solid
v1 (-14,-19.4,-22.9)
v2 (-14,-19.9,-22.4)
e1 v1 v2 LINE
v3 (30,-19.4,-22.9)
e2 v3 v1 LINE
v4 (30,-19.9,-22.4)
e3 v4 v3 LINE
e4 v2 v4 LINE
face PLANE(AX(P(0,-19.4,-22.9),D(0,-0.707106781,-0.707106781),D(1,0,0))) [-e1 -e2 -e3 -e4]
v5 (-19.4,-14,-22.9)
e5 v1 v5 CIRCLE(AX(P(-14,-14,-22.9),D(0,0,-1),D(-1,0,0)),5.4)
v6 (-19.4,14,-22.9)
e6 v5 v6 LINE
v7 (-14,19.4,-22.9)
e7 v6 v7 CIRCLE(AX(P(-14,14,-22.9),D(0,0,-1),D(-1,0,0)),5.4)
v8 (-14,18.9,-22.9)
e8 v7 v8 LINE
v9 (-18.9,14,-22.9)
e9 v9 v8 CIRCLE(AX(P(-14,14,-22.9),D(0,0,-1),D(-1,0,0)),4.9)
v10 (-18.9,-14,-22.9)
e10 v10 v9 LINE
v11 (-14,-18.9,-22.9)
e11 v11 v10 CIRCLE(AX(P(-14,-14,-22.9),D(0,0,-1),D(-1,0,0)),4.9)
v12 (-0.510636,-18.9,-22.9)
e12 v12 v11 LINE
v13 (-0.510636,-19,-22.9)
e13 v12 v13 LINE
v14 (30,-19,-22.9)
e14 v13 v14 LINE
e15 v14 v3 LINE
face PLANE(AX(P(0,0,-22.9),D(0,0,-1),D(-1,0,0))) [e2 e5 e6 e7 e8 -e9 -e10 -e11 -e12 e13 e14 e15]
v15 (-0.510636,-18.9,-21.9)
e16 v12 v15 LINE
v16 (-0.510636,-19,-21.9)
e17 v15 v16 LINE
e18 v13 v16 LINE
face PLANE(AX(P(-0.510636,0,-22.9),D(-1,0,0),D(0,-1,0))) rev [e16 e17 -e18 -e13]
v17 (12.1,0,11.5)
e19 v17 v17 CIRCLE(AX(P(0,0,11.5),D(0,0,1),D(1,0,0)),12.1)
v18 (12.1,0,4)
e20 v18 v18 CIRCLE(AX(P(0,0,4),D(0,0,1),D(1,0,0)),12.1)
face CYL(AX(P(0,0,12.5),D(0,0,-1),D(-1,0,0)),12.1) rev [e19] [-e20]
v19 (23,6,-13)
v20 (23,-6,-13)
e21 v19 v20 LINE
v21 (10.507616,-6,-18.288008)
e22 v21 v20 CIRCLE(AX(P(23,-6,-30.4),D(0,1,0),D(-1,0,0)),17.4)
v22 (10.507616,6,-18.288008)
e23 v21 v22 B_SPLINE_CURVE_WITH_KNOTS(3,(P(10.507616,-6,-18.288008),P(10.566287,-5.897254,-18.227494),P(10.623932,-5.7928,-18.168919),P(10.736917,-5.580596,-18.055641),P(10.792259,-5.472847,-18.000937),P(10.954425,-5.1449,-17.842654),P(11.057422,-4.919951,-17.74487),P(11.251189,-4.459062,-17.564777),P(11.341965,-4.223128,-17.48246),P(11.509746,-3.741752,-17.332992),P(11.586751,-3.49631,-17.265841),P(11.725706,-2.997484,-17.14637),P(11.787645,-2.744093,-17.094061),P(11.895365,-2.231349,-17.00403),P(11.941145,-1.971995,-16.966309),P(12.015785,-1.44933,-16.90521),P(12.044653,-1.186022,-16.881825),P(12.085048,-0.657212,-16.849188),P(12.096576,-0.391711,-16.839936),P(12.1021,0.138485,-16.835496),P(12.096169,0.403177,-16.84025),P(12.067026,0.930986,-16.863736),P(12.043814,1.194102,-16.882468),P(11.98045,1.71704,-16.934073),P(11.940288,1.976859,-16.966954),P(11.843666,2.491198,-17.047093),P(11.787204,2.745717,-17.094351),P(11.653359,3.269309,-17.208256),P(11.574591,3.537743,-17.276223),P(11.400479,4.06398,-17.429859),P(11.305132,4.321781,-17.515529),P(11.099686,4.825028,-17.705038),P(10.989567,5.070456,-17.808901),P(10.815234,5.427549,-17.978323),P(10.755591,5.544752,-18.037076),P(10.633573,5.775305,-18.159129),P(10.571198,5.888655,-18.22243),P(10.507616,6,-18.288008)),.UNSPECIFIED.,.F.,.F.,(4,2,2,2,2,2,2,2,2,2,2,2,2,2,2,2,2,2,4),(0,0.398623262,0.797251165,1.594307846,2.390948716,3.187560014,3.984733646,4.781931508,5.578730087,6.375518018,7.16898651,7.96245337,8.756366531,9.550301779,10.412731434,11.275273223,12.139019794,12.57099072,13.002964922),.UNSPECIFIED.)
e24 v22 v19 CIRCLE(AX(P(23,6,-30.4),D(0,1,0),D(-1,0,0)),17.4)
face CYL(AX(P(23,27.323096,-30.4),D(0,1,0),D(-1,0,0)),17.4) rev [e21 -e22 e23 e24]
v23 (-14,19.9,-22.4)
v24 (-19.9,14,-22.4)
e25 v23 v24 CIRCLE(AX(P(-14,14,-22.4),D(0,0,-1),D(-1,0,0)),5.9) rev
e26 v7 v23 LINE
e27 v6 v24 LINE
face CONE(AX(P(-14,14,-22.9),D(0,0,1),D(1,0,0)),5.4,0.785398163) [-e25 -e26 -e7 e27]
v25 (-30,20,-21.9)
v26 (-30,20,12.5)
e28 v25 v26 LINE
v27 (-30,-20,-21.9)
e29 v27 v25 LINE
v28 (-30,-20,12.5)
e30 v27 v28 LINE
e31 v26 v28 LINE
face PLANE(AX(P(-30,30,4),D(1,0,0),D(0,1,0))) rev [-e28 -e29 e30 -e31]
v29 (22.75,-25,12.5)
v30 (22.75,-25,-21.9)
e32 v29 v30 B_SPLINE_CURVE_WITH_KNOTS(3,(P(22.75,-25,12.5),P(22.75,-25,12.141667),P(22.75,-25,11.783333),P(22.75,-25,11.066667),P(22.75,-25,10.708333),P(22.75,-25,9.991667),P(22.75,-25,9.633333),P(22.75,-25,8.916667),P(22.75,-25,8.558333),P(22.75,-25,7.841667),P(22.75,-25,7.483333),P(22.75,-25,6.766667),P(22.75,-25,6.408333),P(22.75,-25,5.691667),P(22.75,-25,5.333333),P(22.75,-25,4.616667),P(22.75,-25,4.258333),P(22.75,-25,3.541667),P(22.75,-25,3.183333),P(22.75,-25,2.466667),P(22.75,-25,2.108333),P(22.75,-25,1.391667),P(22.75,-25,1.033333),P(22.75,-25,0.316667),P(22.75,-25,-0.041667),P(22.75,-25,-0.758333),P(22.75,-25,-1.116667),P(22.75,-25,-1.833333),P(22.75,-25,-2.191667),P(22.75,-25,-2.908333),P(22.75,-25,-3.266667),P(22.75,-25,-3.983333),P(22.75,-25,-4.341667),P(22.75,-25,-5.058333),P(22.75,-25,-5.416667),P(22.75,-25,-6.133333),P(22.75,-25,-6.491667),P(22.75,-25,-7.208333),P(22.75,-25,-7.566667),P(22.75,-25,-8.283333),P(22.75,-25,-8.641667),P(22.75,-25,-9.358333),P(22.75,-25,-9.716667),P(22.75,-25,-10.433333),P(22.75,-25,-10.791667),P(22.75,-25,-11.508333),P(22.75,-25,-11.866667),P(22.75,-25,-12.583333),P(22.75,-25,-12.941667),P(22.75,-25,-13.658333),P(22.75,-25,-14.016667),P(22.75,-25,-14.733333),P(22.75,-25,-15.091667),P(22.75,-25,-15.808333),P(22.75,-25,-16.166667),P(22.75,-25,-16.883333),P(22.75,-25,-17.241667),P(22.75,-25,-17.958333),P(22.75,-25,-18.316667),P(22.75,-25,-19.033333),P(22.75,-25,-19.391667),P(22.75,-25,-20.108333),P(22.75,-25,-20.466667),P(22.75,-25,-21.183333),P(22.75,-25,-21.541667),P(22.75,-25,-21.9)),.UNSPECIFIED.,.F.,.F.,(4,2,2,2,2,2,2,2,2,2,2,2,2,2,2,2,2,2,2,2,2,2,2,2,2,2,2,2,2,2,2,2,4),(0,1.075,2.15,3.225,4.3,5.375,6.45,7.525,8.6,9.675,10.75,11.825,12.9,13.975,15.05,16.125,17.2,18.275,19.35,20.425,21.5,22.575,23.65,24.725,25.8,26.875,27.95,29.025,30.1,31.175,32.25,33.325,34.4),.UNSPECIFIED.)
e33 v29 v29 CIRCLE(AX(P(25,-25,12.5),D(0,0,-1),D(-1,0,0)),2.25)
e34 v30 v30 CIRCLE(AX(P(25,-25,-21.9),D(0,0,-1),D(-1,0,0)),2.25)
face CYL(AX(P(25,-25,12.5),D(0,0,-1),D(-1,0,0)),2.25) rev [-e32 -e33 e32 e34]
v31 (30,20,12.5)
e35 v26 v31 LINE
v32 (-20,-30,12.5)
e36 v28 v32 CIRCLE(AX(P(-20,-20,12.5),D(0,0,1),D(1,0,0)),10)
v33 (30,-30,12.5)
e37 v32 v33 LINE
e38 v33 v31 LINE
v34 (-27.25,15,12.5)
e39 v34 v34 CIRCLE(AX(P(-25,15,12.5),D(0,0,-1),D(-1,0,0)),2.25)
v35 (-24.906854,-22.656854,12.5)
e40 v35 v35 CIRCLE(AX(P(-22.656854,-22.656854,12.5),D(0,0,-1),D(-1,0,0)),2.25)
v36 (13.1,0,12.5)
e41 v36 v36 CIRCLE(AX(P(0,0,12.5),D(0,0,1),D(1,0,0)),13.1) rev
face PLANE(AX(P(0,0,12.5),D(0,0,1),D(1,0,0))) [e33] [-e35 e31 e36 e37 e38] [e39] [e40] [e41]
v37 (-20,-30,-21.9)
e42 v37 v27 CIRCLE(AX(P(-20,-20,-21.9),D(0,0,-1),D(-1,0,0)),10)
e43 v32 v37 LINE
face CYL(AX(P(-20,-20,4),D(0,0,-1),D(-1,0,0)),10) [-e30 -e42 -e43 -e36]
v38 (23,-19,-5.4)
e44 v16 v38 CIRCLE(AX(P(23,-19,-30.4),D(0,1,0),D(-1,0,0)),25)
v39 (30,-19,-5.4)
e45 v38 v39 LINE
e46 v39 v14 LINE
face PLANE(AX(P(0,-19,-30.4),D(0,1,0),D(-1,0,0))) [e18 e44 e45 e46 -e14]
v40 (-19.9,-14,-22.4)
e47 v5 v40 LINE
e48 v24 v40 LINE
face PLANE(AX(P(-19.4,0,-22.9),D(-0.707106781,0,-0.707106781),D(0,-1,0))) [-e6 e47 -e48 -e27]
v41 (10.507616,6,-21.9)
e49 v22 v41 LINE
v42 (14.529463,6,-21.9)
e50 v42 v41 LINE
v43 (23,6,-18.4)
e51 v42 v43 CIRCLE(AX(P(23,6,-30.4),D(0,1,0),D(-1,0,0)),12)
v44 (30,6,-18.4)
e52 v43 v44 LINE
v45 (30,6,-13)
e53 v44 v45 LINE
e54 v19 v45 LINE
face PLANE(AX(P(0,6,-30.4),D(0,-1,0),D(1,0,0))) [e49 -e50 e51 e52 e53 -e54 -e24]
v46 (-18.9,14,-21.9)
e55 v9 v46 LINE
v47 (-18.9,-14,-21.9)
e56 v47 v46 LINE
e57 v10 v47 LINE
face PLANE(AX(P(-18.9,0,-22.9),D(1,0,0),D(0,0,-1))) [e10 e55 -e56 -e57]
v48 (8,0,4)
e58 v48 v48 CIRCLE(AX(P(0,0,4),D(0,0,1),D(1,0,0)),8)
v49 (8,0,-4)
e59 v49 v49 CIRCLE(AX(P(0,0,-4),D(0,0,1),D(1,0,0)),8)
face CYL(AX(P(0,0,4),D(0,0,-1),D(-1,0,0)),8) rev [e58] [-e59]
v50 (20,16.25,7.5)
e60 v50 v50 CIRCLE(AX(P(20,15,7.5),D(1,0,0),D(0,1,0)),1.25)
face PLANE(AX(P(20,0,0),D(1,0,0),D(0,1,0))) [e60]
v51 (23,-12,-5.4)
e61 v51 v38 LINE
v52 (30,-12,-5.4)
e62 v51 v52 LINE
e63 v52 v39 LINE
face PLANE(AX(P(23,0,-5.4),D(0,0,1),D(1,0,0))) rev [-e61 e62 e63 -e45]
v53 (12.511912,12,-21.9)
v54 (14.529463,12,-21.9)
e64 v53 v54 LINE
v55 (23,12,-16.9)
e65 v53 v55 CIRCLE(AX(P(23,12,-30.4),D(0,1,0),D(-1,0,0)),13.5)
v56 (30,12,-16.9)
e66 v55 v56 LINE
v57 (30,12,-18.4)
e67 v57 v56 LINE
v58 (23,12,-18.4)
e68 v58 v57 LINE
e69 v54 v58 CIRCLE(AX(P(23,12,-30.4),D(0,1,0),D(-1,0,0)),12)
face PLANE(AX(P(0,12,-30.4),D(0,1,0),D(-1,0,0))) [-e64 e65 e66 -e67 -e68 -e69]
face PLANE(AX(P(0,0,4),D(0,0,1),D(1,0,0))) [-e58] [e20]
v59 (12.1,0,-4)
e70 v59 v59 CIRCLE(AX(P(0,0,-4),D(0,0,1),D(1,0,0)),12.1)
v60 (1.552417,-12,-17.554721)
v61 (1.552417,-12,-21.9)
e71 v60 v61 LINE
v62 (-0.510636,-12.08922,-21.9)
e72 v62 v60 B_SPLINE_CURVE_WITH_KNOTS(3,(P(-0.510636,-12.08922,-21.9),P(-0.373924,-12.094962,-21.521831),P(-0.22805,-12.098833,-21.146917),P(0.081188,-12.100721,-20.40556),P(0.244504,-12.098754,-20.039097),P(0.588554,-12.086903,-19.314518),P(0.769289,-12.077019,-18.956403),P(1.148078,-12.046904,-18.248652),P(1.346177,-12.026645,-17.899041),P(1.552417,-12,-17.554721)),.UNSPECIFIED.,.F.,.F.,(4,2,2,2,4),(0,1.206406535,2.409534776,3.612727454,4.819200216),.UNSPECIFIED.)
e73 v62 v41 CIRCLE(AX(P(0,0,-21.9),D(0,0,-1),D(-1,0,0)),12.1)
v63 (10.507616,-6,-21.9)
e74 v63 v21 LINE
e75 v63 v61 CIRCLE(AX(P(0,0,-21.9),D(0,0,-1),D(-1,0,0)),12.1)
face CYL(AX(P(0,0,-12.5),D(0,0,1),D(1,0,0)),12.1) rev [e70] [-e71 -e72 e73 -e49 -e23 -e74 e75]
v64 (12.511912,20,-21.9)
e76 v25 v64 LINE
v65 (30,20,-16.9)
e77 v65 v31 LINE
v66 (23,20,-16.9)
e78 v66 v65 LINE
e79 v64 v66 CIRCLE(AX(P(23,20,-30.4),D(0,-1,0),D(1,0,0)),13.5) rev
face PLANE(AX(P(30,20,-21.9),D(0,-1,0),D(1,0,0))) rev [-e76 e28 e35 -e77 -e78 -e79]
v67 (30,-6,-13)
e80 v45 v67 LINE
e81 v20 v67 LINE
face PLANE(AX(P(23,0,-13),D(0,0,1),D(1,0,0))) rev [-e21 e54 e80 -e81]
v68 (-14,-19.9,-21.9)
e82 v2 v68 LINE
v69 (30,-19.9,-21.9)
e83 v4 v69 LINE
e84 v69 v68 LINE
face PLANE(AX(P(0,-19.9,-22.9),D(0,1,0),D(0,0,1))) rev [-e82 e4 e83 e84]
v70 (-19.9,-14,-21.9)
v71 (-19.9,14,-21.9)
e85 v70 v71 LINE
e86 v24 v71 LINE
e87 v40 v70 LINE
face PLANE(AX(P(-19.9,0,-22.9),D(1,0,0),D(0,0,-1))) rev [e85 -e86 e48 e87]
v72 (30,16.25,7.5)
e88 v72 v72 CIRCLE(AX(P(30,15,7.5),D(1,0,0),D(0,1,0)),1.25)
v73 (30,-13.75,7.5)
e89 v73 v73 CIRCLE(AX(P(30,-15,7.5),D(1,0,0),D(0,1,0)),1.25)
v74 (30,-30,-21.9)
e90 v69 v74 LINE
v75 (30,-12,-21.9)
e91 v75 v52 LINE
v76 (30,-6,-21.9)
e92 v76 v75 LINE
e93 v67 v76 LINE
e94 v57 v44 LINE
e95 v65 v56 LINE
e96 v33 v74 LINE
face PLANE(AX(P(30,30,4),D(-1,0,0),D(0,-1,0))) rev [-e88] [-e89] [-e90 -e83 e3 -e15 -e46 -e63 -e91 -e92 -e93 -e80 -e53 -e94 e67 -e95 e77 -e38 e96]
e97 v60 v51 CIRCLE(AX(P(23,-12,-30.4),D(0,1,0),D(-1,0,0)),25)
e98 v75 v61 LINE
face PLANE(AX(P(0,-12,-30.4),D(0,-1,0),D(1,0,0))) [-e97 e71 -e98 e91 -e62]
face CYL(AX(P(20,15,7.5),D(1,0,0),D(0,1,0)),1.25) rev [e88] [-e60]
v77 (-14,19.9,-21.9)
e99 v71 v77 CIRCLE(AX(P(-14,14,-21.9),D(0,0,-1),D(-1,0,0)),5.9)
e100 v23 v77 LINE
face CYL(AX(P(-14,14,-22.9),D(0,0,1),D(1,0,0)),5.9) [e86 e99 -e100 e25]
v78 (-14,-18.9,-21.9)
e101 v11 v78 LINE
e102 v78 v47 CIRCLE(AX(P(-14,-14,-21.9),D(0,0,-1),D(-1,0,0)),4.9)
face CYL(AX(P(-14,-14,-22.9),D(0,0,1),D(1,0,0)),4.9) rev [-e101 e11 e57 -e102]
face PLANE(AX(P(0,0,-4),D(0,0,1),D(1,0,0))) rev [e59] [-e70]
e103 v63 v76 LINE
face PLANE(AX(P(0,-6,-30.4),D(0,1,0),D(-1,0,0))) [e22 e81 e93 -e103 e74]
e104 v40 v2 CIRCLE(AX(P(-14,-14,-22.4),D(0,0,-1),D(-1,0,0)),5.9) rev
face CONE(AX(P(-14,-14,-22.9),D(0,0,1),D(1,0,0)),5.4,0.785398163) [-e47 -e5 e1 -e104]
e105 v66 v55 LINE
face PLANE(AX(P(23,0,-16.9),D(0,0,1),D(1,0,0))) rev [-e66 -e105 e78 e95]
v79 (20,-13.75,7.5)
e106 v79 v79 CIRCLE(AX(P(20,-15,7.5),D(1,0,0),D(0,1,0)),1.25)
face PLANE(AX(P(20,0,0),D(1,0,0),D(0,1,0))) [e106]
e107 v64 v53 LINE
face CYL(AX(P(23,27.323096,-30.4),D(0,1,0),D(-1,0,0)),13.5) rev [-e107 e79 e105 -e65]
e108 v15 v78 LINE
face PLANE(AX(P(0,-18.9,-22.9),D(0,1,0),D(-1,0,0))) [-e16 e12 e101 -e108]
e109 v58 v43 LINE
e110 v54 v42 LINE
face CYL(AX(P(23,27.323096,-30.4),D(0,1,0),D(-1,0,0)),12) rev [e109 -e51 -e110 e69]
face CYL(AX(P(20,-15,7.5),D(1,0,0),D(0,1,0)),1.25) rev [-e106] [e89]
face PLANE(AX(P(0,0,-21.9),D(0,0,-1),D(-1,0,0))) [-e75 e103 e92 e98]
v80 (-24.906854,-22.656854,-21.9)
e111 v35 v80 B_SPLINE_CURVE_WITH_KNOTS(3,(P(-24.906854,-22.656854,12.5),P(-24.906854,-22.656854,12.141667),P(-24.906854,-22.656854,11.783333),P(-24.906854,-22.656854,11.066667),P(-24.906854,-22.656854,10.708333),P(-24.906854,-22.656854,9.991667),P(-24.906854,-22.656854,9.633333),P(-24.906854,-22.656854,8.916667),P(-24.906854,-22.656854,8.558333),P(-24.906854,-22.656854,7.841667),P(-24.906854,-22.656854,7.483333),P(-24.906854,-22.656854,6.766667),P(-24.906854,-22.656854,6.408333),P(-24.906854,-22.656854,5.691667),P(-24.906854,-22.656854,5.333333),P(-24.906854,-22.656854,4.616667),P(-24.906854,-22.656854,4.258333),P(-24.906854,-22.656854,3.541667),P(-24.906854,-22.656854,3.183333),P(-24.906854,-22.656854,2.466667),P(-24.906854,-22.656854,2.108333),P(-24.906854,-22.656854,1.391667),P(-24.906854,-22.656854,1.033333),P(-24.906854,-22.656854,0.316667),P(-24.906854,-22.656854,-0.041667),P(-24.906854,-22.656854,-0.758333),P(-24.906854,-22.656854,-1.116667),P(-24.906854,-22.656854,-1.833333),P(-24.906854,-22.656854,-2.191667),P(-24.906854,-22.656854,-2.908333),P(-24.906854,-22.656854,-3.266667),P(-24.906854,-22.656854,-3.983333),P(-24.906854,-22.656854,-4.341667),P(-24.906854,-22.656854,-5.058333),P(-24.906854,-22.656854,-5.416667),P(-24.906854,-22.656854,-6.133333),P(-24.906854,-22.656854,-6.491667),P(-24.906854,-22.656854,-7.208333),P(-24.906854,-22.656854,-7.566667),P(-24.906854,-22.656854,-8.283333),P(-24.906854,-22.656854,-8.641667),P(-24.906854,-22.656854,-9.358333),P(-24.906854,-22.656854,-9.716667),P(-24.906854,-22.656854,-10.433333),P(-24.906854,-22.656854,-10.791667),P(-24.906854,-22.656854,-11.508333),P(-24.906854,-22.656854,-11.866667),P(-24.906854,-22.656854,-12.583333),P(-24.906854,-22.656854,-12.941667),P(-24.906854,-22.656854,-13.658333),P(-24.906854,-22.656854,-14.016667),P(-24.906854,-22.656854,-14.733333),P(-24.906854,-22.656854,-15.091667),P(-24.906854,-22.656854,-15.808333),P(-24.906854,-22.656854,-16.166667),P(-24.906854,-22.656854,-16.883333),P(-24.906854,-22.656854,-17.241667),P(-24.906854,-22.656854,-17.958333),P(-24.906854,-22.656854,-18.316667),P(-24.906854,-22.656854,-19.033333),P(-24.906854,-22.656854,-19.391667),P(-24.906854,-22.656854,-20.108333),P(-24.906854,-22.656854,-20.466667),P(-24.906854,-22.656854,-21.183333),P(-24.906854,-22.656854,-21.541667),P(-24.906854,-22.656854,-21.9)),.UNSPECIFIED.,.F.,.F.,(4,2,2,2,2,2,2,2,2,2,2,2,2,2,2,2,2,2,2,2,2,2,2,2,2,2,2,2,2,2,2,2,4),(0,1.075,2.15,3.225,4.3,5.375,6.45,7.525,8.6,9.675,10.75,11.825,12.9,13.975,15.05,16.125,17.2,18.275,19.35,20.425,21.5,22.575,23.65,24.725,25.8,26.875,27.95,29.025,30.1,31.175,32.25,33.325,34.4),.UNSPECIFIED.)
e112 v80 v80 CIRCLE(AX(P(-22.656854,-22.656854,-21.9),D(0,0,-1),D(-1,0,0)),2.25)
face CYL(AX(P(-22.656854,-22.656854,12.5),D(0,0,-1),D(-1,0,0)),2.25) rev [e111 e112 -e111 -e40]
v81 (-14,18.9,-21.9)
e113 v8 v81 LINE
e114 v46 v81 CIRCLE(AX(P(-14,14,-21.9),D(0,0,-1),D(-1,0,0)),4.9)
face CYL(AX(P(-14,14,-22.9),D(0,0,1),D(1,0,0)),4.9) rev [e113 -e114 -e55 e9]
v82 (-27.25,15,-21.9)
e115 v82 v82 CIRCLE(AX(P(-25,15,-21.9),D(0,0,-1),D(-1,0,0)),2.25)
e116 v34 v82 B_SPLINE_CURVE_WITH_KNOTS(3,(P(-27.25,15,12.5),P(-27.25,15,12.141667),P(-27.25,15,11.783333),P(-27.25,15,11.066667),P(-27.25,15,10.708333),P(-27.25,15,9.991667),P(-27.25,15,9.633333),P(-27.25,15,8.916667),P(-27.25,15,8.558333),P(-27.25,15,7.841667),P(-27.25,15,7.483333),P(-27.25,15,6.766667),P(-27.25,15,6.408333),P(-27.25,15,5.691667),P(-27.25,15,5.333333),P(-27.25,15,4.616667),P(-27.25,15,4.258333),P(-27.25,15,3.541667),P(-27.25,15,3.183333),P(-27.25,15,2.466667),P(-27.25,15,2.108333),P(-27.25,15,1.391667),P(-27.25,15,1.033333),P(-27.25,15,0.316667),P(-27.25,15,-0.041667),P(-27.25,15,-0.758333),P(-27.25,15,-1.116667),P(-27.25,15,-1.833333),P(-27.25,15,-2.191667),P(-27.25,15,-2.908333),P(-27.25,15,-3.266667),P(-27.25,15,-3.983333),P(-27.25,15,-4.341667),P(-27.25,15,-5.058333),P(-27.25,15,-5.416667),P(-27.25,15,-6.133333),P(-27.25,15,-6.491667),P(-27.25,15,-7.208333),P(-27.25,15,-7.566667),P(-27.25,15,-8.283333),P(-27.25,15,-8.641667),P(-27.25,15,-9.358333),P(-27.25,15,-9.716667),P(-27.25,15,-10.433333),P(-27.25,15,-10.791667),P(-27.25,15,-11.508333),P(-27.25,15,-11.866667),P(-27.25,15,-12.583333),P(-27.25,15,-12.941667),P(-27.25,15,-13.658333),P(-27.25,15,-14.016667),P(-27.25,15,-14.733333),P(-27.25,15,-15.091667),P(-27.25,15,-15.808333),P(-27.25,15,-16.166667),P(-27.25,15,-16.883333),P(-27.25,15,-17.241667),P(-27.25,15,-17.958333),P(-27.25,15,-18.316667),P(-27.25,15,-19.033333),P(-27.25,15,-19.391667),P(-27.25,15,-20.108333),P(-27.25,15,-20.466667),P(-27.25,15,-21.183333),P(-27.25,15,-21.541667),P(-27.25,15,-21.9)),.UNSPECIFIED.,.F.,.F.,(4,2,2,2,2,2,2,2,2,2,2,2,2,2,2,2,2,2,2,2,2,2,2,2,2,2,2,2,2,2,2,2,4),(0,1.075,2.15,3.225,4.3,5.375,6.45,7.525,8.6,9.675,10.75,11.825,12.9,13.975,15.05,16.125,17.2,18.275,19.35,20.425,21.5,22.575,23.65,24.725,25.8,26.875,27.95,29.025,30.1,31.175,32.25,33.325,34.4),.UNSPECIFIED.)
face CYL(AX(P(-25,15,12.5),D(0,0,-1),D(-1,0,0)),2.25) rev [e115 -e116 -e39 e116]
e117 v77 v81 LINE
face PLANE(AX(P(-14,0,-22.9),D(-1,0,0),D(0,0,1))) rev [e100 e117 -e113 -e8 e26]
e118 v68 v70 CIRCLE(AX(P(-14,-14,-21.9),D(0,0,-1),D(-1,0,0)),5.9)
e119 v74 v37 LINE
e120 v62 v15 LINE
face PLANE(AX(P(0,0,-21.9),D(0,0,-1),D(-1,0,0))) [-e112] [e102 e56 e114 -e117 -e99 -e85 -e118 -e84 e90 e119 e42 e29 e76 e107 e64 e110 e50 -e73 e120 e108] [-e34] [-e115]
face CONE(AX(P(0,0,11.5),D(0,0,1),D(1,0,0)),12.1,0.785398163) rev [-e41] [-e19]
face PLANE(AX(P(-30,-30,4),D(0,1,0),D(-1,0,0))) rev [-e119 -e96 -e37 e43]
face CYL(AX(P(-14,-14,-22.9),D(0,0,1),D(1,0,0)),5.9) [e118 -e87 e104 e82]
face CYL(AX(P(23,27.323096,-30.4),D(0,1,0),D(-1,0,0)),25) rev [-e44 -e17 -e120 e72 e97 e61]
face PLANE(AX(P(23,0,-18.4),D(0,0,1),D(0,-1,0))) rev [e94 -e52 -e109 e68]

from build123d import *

# Parameters (mm, degrees)
SCHIZZO1_W                   = 60
SCHIZZO1_H                   = 60
SCHIZZO1_R                   = 8
ESTRUSIONE_ESTRUSIONE1_DEPTH = 4
SCHIZZO2_W                   = 60
SCHIZZO2_H                   = 60
SCHIZZO2_R                   = 12.1
ESTRUSIONE_ESTRUSIONE2_DEPTH = 8.5
SCHIZZO6_W                   = 60
SCHIZZO6_H                   = 60
SCHIZZO6_R                   = 12.1
ESTRUSIONE_ESTRUSIONE3_DEPTH = 9.4
SCHIZZO3_W                   = 60
SCHIZZO3_H                   = 10
TAGLIO_ESTRUSIONE1_DEPTH     = 55.620142805
RACCORDO2_R                  = 10
SCHIZZO10_R                  = 2.25
TAGLIO_ESTRUSIONE3_DEPTH     = 55.62014286
ESTRUSIONE_ESTRUSIONE5_DEPTH = 1
SMUSSO2_SIZE                 = 0.5
SCHIZZO12_R                  = 1.25
TAGLIO_ESTRUSIONE4_DEPTH     = 10
SCHIZZO14_W                  = 1.470153799
SCHIZZO14_H                  = 12
SCHIZZO14_W_2                = 1
SCHIZZO14_H_2                = 7
TAGLIO_ESTRUSIONE5_DEPTH     = 7
SMUSSO3_SIZE                 = 1


# Read off the part's stored shape, not the designer's step: Estrusione-Estrusione5
with BuildPart() as part:
    # Schizzo1 → Estrusione-Estrusione1 (new, symmetric)
    with BuildSketch(Plane.XY):
        Rectangle(SCHIZZO1_W, SCHIZZO1_H)
        Circle(SCHIZZO1_R, mode=Mode.SUBTRACT)
    extrude(amount=ESTRUSIONE_ESTRUSIONE1_DEPTH, both=True)

    # Schizzo2 → Estrusione-Estrusione2 (add)
    with BuildSketch(Plane.XY.offset(4)):
        Rectangle(SCHIZZO2_W, SCHIZZO2_H)
        Circle(SCHIZZO2_R, mode=Mode.SUBTRACT)
    estrusione_estrusione2 = extrude(amount=ESTRUSIONE_ESTRUSIONE2_DEPTH)

    # Specchia1: Estrusione-Estrusione2 across plane
    add(estrusione_estrusione2.mirror(Plane.XY))

    # Schizzo6 → Estrusione-Estrusione3 (add)
    with BuildSketch(Plane(origin=(0, 0, -12.5), x_dir=(-1, 0, 0), z_dir=(0, 0, -1))):
        Rectangle(SCHIZZO6_W, SCHIZZO6_H)
        with Locations(Location((0, 0, 0), (0, 0, 180))):
            Circle(SCHIZZO6_R, mode=Mode.SUBTRACT)
    extrude(amount=ESTRUSIONE_ESTRUSIONE3_DEPTH)

    # Schizzo3 → Taglio-Estrusione1 (cut, through all)
    with BuildSketch(Plane.XY.offset(12.5)):
        with Locations((0, 25)):
            Rectangle(SCHIZZO3_W, SCHIZZO3_H)
    extrude(amount=-TAGLIO_ESTRUSIONE1_DEPTH, mode=Mode.SUBTRACT)

    # Raccordo2
    raccordo2_edges = [part.edges().sort_by_distance(p)[0] for p in [
        (-30, -30, -4.7),
    ]]
    fillet(raccordo2_edges, radius=RACCORDO2_R)

    # Schizzo13 → Taglia-Rivoluzione4 (revolve, cut)
    with BuildSketch(Plane(origin=(0, 0, -30.4), x_dir=(-1, 0, 0), z_dir=(0, 0, -1))):
        Polygon((-9.5, 25.081325019), (-22, 25.081325019), (-22, -19), (2, -19), (2, -12), (-16, -12), (-16, -6), (-5.6, -6), (-5.6, 6), (-11, 6), (-11, 12), (-9.5, 12), align=None)
    revolve(axis=Axis((23, 27.323096352, -30.4), (0, -1, 0)), mode=Mode.SUBTRACT)

    # Schizzo10 → Taglio-Estrusione3 (cut, through all)
    with BuildSketch(Plane(origin=(0, 0, -21.9), x_dir=(-1, 0, 0), z_dir=(0, 0, -1))):
        with Locations((-25, -25)):
            Circle(SCHIZZO10_R)
        with Locations((22.656854249, -22.656854249)):
            Circle(SCHIZZO10_R)
        with Locations((25, 15)):
            Circle(SCHIZZO10_R)
    extrude(amount=-TAGLIO_ESTRUSIONE3_DEPTH, mode=Mode.SUBTRACT)

    # Estrusione-Estrusione5 outline → Estrusione-Estrusione5 (add)
    with BuildSketch(Plane(origin=(0, 0, -21.9), x_dir=(-1, 0, 0), z_dir=(0, 0, -1))):
        with BuildLine():
            Line((14, 19.9), (14, 18.9))
            ThreePointArc((14, 18.9), (17.464823228, 17.464823228), (18.9, 14))
            Line((18.9, 14), (18.9, -14))
            ThreePointArc((18.9, -14), (17.464823228, -17.464823228), (14, -18.9))
            Line((14, -18.9), (0.510635891, -18.9))
            Line((0.510635891, -18.9), (0.510635891, -19))
            Line((0.510635891, -19), (-30, -19))
            Line((-30, -19), (-30, -19.9))
            Line((-30, -19.9), (14, -19.9))
            ThreePointArc((14, -19.9), (18.171930009, -18.171930009), (19.9, -14))
            Line((19.9, -14), (19.9, 14))
            ThreePointArc((19.9, 14), (18.171930009, 18.171930009), (14, 19.9))
        make_face()
    extrude(amount=ESTRUSIONE_ESTRUSIONE5_DEPTH)

    # Smusso2
    smusso2_edges = [part.edges().sort_by_distance(p)[0] for p in [
        (8, -19.9, -22.9),
        (-18.171930009, -18.171930009, -22.9),
        (-19.9, 0, -22.9),
        (-18.171930009, 18.171930009, -22.9),
    ]]
    chamfer(smusso2_edges, length=SMUSSO2_SIZE)

    # Schizzo12 → Taglio-Estrusione4 (cut)
    with BuildSketch(Plane(origin=(30, 0, 0), x_dir=(0, 0, -1), z_dir=(1, 0, 0))):
        with Locations(Location((-7.5, -15, 0), (0, 0, 90))):
            Circle(SCHIZZO12_R)
        with Locations(Location((-7.5, 15, 0), (0, 0, 90))):
            Circle(SCHIZZO12_R)
    extrude(amount=-TAGLIO_ESTRUSIONE4_DEPTH, mode=Mode.SUBTRACT)

    # Schizzo14 → Taglio-Estrusione5 (cut)
    with BuildSketch(Plane(origin=(30, 0, 0), x_dir=(0, 0, -1), z_dir=(1, 0, 0))):
        with Locations((13.7350769, 0)):
            Rectangle(SCHIZZO14_W, SCHIZZO14_H)
        Polygon((20.653205655, 6), (20.653205655, 12), (18.856603619, 12), (18.856603619, 20), (16.9, 20), (16.9, 12), (18.4, 12), (18.4, 6), align=None)
        with Locations((5.9, -15.5)):
            Rectangle(SCHIZZO14_W_2, SCHIZZO14_H_2)
    extrude(amount=-TAGLIO_ESTRUSIONE5_DEPTH, mode=Mode.SUBTRACT)

    # Smusso3
    smusso3_edges = [part.edges().sort_by_distance(p)[0] for p in [
        (-12.1, 0, 12.5),
    ]]
    chamfer(smusso3_edges, length=SMUSSO3_SIZE)


solid = part.part
